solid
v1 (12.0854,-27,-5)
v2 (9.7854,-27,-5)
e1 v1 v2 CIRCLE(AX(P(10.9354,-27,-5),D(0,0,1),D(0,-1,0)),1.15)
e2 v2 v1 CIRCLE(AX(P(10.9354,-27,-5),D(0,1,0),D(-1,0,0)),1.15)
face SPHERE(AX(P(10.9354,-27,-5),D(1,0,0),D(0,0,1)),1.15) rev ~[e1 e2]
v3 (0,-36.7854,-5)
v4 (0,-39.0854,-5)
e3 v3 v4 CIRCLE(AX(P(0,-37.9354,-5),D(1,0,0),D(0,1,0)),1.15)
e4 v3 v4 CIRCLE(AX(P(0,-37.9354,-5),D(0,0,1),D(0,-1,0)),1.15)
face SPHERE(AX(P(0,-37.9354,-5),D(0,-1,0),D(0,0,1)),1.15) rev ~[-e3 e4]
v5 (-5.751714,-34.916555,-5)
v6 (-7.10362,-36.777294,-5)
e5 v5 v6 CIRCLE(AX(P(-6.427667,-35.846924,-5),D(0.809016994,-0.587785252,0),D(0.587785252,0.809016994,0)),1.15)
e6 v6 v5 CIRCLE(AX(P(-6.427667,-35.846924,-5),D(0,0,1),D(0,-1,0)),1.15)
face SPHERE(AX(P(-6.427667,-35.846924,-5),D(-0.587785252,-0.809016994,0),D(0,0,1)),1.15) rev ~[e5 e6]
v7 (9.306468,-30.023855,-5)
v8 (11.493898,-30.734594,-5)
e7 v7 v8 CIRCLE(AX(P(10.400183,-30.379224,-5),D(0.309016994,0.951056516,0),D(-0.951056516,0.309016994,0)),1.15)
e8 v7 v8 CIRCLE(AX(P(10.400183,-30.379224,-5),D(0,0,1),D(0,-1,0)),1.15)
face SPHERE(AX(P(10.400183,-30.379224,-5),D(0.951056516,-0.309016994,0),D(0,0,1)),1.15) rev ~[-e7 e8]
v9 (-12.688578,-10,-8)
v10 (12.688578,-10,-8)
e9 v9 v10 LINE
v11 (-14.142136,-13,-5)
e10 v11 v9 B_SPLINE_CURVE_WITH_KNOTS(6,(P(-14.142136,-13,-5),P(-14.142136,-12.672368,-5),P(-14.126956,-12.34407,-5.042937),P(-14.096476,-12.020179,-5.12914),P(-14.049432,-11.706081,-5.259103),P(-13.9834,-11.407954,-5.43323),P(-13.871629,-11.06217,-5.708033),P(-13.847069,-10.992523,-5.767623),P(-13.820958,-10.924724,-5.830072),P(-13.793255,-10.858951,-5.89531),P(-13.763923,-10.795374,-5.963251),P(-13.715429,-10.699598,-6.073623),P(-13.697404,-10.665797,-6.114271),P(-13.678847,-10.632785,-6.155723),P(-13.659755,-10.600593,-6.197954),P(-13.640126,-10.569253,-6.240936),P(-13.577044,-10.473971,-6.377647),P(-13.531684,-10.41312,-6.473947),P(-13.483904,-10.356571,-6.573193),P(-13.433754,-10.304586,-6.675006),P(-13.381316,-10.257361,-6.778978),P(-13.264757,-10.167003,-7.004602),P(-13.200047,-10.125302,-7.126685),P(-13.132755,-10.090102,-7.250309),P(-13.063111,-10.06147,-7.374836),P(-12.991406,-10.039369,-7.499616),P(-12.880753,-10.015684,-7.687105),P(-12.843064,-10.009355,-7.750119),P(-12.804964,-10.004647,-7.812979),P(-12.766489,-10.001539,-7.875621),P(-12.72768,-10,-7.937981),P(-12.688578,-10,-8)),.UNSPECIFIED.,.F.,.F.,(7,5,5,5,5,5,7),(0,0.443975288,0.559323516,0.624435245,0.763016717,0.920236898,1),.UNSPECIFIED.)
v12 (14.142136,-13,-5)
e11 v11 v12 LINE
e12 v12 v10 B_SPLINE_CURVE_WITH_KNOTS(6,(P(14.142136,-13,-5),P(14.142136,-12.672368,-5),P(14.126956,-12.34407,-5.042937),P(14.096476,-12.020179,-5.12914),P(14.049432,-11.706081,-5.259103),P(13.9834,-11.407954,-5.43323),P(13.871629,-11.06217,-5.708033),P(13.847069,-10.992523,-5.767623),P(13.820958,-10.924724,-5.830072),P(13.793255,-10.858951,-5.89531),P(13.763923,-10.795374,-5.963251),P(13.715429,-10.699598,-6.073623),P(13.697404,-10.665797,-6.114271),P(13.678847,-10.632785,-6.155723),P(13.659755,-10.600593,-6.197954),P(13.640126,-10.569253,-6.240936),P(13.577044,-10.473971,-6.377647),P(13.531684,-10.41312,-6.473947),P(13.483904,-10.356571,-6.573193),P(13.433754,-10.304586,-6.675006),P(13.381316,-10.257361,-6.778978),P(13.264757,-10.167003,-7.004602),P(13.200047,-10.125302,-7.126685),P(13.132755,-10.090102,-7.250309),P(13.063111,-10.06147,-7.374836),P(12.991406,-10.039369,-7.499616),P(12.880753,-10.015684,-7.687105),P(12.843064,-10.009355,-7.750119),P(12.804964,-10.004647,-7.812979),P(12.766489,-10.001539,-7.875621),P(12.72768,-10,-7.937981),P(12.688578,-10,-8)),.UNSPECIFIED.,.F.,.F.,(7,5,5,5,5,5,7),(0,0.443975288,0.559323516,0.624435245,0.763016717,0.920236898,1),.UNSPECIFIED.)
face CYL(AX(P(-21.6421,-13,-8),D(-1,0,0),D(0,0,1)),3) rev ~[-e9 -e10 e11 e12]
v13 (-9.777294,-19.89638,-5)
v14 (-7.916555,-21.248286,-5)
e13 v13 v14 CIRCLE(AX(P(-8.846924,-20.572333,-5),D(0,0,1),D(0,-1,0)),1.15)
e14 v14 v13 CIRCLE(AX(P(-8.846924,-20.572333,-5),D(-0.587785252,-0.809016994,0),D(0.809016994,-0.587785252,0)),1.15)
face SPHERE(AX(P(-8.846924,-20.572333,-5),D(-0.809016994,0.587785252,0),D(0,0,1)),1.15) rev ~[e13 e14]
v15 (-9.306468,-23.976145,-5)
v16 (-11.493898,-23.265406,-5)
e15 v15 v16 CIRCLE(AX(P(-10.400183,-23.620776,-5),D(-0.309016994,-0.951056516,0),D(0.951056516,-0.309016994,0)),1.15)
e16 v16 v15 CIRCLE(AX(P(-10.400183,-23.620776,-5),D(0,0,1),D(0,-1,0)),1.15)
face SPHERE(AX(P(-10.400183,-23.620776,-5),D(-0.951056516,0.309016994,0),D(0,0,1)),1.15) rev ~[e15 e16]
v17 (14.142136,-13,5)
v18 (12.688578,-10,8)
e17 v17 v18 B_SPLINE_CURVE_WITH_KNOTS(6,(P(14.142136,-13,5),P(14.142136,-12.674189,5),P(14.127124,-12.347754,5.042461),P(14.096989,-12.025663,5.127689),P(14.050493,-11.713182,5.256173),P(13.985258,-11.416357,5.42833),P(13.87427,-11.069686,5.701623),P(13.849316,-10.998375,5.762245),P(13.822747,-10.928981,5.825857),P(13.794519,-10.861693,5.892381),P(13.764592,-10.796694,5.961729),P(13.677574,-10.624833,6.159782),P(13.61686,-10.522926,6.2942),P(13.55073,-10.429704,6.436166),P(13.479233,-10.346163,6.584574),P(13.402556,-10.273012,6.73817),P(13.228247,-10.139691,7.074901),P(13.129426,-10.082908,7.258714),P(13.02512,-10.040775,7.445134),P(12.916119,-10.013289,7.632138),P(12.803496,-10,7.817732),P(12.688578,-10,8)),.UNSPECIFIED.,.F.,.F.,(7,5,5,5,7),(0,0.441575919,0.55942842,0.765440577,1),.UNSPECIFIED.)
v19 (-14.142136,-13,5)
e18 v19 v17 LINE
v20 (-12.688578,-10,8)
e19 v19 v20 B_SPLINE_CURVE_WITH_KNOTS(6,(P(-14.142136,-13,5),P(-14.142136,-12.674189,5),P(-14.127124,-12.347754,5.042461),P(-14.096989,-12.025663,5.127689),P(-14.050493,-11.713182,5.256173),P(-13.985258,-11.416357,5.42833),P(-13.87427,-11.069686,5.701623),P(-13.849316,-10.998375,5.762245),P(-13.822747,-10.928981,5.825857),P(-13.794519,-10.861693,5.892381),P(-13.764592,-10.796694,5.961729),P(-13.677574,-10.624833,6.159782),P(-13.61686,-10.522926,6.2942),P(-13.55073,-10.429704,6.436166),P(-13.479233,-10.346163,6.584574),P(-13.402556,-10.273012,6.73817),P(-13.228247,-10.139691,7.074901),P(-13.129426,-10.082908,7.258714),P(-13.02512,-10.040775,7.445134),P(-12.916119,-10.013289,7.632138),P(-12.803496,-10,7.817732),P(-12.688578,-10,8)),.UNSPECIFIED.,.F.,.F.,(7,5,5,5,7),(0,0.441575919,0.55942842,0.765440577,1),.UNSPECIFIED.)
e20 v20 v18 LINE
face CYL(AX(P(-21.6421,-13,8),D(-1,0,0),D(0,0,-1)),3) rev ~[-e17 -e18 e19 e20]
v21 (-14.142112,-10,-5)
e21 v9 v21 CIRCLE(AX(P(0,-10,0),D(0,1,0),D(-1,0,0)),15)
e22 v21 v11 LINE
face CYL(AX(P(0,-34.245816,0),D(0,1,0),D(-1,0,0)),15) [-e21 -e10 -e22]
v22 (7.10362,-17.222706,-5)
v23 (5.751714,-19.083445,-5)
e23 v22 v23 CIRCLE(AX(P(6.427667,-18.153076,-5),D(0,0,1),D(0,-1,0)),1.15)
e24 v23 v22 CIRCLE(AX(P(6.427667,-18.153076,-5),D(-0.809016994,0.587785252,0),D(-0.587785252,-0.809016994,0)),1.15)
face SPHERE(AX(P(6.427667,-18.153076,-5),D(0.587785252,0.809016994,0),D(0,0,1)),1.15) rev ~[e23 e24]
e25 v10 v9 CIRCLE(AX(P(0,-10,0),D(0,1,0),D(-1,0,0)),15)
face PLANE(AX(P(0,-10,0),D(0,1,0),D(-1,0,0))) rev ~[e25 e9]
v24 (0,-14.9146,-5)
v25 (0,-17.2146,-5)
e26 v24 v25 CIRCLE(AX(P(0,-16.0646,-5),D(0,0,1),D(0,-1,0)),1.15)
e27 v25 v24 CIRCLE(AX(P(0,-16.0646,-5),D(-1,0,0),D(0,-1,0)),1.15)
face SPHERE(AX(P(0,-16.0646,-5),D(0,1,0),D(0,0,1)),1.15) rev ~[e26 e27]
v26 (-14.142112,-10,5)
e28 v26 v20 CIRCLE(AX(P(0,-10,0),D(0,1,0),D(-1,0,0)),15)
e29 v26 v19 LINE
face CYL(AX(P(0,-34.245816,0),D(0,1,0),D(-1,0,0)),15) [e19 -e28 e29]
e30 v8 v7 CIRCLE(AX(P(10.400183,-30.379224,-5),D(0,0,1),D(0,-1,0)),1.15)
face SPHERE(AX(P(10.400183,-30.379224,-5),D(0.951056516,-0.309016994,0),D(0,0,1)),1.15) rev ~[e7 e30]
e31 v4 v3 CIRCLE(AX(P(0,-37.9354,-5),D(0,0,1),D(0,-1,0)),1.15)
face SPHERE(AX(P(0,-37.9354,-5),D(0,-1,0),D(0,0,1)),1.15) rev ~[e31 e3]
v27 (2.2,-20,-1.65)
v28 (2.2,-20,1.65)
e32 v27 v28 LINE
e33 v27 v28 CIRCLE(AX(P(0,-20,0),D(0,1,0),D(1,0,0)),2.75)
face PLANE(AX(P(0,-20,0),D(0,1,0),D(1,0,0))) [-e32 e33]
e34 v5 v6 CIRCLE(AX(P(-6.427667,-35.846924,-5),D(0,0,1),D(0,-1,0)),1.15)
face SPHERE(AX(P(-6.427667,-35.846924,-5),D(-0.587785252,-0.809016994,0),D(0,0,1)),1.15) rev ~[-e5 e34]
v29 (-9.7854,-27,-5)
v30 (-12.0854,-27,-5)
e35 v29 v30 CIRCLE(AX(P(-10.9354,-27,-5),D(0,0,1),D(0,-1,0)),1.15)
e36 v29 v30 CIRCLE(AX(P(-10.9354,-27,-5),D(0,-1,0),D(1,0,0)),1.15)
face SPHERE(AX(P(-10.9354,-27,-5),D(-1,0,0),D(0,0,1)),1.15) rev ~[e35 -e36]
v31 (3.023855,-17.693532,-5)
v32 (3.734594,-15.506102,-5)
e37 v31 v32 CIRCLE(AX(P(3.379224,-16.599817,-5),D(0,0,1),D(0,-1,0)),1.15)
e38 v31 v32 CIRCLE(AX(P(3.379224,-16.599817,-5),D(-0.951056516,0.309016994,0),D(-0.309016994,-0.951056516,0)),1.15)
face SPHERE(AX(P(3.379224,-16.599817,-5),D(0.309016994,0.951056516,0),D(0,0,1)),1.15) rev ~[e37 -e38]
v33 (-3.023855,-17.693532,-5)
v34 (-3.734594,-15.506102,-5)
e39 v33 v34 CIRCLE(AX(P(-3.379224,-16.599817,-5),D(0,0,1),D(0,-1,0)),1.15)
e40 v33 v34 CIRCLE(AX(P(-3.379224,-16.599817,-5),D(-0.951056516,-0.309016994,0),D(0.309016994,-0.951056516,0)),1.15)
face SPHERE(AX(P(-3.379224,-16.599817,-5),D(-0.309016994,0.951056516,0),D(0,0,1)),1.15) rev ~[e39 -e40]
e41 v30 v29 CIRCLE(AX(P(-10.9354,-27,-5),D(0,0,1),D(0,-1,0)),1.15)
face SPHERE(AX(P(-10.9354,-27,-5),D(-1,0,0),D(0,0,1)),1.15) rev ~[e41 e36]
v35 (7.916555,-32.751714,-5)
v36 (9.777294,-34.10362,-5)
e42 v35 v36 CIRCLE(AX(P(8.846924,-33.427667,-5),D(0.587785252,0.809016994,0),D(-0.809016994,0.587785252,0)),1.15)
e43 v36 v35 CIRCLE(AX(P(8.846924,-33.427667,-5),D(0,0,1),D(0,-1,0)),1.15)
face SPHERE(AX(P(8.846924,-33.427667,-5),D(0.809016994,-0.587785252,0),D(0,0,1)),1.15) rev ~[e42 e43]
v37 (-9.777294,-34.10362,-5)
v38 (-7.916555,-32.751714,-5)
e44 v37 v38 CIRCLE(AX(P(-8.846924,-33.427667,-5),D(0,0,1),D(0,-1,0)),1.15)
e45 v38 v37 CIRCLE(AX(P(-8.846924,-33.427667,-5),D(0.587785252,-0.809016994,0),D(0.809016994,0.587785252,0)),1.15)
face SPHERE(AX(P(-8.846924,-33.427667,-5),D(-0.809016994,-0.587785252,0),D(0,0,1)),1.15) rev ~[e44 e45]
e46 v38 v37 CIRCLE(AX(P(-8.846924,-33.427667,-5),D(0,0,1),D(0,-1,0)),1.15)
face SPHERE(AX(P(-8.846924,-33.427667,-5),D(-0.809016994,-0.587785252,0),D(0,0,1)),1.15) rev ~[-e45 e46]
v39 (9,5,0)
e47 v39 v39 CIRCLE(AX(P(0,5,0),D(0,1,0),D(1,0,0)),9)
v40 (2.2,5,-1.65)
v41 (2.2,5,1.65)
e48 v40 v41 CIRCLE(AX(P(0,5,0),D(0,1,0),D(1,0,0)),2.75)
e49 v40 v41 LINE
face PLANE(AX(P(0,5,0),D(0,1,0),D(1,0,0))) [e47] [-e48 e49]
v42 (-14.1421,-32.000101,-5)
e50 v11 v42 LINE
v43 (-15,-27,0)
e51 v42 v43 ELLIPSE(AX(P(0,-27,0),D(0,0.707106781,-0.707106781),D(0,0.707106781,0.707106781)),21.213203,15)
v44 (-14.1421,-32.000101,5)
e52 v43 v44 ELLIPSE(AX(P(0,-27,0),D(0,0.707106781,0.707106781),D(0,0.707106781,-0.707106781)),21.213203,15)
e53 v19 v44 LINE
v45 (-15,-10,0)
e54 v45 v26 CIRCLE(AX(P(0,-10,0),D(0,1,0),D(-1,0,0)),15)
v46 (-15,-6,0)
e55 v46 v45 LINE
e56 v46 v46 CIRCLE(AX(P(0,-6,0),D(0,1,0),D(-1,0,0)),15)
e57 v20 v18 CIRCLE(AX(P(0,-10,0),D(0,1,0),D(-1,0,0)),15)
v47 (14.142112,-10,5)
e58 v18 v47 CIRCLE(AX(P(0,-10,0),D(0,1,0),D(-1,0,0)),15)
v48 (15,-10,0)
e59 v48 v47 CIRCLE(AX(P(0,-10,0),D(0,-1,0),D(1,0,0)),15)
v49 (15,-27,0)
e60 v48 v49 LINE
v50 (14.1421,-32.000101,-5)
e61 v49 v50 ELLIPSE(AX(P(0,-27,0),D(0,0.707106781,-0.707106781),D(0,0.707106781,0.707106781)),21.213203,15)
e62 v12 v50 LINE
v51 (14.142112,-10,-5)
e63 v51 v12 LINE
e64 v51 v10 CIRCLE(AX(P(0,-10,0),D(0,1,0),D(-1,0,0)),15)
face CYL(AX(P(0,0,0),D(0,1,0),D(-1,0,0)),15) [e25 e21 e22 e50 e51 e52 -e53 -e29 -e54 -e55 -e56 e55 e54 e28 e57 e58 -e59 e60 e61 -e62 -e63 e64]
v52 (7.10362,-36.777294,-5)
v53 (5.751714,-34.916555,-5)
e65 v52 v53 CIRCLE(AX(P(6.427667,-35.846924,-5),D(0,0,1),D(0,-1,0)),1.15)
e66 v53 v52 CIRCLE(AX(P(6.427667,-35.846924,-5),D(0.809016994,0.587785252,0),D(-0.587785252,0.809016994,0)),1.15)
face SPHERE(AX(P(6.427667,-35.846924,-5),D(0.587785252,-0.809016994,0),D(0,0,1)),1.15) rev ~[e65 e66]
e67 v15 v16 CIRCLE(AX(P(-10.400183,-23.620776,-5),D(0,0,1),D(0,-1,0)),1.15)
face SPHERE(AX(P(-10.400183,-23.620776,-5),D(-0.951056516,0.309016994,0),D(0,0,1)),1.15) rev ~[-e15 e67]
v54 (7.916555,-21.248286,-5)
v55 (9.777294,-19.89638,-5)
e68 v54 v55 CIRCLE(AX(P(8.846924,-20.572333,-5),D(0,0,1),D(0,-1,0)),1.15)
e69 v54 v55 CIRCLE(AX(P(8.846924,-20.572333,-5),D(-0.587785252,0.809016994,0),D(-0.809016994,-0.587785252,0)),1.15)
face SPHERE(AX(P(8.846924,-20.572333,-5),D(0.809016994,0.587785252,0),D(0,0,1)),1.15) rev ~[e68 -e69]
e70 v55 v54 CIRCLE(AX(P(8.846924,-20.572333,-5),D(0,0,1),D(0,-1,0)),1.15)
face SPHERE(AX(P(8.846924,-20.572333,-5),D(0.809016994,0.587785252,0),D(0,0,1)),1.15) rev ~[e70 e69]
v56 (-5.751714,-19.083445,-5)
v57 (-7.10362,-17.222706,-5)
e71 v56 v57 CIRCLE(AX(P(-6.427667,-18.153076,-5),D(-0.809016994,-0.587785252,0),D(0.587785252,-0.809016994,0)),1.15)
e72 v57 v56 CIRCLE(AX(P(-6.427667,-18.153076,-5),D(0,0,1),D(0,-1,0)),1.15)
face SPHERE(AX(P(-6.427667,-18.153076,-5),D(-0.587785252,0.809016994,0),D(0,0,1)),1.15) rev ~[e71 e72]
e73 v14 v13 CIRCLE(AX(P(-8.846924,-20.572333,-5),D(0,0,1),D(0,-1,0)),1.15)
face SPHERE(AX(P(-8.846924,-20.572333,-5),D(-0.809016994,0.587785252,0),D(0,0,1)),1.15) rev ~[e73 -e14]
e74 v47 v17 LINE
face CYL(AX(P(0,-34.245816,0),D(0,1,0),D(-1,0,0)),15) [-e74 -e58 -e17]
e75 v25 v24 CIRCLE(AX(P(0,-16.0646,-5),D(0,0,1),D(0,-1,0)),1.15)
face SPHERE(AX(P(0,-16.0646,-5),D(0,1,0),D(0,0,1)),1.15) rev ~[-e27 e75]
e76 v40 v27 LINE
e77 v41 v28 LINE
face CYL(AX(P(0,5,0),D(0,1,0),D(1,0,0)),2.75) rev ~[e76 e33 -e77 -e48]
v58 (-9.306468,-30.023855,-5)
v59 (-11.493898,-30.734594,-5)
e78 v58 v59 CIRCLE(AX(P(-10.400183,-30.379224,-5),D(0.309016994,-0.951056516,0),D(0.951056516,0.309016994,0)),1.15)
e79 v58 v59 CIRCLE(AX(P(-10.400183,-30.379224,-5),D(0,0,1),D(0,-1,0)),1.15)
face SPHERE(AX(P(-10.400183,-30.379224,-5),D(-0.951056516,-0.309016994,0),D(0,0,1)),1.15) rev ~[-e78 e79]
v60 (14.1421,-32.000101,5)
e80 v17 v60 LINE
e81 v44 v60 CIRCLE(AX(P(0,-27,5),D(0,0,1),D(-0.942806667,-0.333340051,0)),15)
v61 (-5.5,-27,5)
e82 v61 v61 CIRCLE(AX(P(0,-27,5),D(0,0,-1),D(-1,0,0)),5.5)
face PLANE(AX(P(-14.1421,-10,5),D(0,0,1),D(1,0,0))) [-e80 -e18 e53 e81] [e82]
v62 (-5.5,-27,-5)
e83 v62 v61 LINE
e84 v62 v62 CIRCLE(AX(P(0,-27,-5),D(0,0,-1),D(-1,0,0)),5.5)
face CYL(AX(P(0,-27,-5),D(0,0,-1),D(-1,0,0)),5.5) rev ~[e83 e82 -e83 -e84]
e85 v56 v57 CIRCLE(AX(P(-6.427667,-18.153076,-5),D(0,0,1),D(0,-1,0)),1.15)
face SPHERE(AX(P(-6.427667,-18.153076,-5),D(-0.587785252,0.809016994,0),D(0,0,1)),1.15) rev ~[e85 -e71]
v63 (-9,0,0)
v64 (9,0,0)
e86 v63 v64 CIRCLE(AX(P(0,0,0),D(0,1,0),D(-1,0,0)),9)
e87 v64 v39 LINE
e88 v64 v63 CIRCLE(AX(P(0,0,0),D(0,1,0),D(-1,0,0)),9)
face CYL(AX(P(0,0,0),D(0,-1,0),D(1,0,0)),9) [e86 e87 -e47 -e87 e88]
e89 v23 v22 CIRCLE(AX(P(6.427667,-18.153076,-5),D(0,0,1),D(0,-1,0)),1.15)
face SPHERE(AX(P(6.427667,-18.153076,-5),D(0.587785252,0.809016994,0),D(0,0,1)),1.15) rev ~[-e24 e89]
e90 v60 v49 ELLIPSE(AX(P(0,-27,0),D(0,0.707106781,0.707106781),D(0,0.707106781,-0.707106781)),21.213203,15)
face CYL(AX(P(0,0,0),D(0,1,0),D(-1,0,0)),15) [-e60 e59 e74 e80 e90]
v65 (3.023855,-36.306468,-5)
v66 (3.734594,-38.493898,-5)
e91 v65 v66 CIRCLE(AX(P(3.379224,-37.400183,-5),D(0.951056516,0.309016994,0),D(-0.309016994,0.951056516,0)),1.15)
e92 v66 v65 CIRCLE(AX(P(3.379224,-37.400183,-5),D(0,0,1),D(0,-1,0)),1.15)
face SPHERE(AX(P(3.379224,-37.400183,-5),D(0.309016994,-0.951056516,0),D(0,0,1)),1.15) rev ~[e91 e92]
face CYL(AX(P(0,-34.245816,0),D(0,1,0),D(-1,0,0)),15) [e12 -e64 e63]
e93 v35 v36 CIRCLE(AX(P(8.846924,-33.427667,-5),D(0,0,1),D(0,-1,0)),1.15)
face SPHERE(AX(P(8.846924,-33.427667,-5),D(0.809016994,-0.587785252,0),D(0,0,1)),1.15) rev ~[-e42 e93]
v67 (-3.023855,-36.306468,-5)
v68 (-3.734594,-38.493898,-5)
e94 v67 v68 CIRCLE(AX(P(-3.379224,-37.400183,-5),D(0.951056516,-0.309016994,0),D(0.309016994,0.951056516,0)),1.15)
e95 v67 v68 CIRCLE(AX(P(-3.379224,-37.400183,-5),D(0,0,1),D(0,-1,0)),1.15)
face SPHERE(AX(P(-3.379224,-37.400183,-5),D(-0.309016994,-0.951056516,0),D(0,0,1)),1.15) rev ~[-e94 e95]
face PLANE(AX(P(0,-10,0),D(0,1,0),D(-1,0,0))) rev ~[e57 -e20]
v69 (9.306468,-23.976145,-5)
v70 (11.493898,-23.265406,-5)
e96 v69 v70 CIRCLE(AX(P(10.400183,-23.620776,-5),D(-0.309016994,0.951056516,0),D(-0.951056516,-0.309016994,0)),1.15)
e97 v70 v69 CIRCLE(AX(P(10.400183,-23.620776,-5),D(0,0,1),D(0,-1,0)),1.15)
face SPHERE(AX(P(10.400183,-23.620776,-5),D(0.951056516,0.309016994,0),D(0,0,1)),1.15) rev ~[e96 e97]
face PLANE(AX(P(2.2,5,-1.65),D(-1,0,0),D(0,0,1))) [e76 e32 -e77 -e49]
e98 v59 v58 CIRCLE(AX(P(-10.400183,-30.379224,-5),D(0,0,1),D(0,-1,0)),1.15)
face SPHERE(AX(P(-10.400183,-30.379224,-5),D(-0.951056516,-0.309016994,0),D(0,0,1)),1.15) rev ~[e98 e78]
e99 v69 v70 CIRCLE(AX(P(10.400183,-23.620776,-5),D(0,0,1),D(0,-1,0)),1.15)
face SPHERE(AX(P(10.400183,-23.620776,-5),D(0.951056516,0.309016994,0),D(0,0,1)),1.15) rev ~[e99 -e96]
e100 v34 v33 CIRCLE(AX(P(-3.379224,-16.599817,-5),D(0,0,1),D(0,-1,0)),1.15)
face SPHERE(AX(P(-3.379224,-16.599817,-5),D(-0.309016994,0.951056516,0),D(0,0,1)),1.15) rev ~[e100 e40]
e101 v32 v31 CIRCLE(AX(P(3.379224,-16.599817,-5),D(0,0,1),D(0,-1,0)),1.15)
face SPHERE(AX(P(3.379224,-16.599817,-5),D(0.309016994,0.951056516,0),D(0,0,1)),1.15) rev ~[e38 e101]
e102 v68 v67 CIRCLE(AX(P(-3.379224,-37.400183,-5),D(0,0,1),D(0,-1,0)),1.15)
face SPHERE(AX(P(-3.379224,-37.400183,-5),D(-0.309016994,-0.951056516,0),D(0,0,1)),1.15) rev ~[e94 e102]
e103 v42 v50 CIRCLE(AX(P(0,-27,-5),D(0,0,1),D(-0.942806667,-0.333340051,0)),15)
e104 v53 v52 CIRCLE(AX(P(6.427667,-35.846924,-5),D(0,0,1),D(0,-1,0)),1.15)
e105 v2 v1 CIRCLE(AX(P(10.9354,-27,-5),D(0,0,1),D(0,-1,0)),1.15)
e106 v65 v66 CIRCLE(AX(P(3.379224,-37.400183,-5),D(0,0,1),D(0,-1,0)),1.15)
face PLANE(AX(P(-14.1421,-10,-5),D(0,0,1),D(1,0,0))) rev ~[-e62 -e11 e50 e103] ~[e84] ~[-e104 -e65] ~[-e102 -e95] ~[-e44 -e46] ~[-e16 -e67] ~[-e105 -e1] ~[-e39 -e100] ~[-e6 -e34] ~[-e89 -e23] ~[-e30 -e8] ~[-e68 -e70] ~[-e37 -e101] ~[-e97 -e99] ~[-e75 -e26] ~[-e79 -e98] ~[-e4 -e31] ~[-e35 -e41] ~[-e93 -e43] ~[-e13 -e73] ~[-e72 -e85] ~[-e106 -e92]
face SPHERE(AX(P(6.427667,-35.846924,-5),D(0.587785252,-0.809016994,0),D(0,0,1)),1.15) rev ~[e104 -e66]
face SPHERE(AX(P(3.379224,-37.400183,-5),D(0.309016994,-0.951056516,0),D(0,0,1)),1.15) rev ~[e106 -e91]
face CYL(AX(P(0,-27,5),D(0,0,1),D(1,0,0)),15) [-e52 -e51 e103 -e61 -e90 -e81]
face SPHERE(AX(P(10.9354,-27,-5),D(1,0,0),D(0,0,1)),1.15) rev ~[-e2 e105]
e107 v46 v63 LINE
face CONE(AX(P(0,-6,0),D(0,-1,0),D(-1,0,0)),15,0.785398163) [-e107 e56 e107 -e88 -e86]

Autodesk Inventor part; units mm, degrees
ref_plane "YZ Plane" through (0, 0, 0) normal (1, 0, 0) x (0, 1, 0)
ref_plane "XZ Plane" through (0, 0, 0) normal (0, 1, 0) x (-1, 0, 0)
ref_plane "XY Plane" through (0, 0, 0) normal (0, 0, 1) x (1, 0, 0)
sketch "스케치1" plane through (0, 0, 0) normal (0, 1, 0) x (-1, 0, 0)
  circle A0 centre (0, 0) radius 15
  dimension "d0" = 30
extrude "돌출1" add sketch "스케치1" against normal blind 10
sketch "스케치2" plane through (0, -10, 0) normal (0, -1, 0) x (1, 0, 0)
  circle A0 centre (0, 0) radius 15 projected
  circle A1 centre (0, 0) radius 15 projected
  line L0 (-14.1421, 5) -> (14.1421, 5)
  line L1 (0, 0) -> (4.8665, 0)
  line L2 (-14.1421, -5) -> (14.1421, -5)
  dimension "d3" = 10
extrude "돌출2" add sketch "스케치2" along normal blind 32 contours A0 L2 L0
sketch "스케치3" plane through (-14.1421, -10, 5) normal (0, 0, 1) x (1, 0, 0)
  circle A0 centre (14.1421, -17) radius 15
  line L0 (28.2843, -32) -> (0, -32) projected
  line L1 (-0.8579, -2) -> (29.1421, -2)
  line L2 (29.1421, -2) -> (29.1421, -32)
  line L3 (29.1421, -32) -> (-0.8579, -32)
  line L4 (-0.8579, -32) -> (-0.8579, -2)
  line L5 (-0.8579, -2) -> (29.1421, -32) construction
  line L6 (29.1421, -2) -> (-0.8579, -32) construction
  line L7 (28.2843, -32) -> (29.1421, -32) projected
  point P0 (14.1421, 10)
  point P1 (14.1421, -32)
  point P2 (-0.8579, -17)
  point P3 (14.1421, -32)
  point P4 (29.1421, -17)
  dimension "d6" = 30
extrude "돌출3" cut sketch "스케치3" against normal blind 32 contours L2 L3 L0 A0 | L0 L3 L4 A0
chamfer "모따기1" distance 6 angle 45 1 edges at (15, 0, 0)
fillet "모깎기1" radius 3 2 edges at (0, -10, -5) (0, -10, 5)
sketch "스케치4" plane through (0, 0, 0) normal (1, 0, 0) x (0, 1, 0)
  line L0 (-41.9354, -5) -> (-11.9354, -5)
  line L1 (-13, -5) -> (-32, -5) projected
  line L2 (-42, -5) -> (-32, -5) projected
  circle A0 centre (-37.9354, -5) radius 1.15
  point P0 (0, 0)
  point P1 (-26.9354, -5)
  point P2 (-36.7854, -5)
  point P3 (-39.0854, -5)
  dimension "d15" = 30
  dimension "d16" = 2.3
  dimension "d17" = 11
revolve "회전1" cut sketch "스케치4" angle 360 about axis through (0, -41.9354, -5) along (0, 1, 0) picked at (-37.8892, -4.6195) contours A0 L0
sketch "스케치5" plane through (0, -27, -5) normal (0, 0, -1) x (-1, 0, 0)
  circle A0 centre (0, 0) radius 5.5
  arc A1 (-14.1421, -5) -> (14.1421, -5) centre (0, 0) ccw projected
  point P0 (0, 27)
  dimension "d19" = 11
extrude "돌출4" cut sketch "스케치5" against normal blind 32
pattern_circular "원형 패턴1" count 20 over 360 about axis through (0, -27, -5) along (0, 0, 1) of "회전1"
sketch "스케치6" plane through (0, 0, 0) normal (0, 1, 0) x (1, 0, 0)
  circle A0 centre (0, 0) radius 9 projected
extrude "돌출5" add sketch "스케치6" along normal blind 5
sketch "스케치7" plane through (0, 5, 0) normal (0, 1, 0) x (1, 0, 0)
  circle A0 centre (0, 0) radius 2.75
  line L0 (2.2, 1.65) -> (2.2, -1.65)
  dimension "d27" = 5.5
  dimension "d28" = 2.2
extrude "돌출6" cut sketch "스케치7" against normal blind 25 contours L0 A0 picked at (-0.2276, -0.7952)
properties part number "회전대"
